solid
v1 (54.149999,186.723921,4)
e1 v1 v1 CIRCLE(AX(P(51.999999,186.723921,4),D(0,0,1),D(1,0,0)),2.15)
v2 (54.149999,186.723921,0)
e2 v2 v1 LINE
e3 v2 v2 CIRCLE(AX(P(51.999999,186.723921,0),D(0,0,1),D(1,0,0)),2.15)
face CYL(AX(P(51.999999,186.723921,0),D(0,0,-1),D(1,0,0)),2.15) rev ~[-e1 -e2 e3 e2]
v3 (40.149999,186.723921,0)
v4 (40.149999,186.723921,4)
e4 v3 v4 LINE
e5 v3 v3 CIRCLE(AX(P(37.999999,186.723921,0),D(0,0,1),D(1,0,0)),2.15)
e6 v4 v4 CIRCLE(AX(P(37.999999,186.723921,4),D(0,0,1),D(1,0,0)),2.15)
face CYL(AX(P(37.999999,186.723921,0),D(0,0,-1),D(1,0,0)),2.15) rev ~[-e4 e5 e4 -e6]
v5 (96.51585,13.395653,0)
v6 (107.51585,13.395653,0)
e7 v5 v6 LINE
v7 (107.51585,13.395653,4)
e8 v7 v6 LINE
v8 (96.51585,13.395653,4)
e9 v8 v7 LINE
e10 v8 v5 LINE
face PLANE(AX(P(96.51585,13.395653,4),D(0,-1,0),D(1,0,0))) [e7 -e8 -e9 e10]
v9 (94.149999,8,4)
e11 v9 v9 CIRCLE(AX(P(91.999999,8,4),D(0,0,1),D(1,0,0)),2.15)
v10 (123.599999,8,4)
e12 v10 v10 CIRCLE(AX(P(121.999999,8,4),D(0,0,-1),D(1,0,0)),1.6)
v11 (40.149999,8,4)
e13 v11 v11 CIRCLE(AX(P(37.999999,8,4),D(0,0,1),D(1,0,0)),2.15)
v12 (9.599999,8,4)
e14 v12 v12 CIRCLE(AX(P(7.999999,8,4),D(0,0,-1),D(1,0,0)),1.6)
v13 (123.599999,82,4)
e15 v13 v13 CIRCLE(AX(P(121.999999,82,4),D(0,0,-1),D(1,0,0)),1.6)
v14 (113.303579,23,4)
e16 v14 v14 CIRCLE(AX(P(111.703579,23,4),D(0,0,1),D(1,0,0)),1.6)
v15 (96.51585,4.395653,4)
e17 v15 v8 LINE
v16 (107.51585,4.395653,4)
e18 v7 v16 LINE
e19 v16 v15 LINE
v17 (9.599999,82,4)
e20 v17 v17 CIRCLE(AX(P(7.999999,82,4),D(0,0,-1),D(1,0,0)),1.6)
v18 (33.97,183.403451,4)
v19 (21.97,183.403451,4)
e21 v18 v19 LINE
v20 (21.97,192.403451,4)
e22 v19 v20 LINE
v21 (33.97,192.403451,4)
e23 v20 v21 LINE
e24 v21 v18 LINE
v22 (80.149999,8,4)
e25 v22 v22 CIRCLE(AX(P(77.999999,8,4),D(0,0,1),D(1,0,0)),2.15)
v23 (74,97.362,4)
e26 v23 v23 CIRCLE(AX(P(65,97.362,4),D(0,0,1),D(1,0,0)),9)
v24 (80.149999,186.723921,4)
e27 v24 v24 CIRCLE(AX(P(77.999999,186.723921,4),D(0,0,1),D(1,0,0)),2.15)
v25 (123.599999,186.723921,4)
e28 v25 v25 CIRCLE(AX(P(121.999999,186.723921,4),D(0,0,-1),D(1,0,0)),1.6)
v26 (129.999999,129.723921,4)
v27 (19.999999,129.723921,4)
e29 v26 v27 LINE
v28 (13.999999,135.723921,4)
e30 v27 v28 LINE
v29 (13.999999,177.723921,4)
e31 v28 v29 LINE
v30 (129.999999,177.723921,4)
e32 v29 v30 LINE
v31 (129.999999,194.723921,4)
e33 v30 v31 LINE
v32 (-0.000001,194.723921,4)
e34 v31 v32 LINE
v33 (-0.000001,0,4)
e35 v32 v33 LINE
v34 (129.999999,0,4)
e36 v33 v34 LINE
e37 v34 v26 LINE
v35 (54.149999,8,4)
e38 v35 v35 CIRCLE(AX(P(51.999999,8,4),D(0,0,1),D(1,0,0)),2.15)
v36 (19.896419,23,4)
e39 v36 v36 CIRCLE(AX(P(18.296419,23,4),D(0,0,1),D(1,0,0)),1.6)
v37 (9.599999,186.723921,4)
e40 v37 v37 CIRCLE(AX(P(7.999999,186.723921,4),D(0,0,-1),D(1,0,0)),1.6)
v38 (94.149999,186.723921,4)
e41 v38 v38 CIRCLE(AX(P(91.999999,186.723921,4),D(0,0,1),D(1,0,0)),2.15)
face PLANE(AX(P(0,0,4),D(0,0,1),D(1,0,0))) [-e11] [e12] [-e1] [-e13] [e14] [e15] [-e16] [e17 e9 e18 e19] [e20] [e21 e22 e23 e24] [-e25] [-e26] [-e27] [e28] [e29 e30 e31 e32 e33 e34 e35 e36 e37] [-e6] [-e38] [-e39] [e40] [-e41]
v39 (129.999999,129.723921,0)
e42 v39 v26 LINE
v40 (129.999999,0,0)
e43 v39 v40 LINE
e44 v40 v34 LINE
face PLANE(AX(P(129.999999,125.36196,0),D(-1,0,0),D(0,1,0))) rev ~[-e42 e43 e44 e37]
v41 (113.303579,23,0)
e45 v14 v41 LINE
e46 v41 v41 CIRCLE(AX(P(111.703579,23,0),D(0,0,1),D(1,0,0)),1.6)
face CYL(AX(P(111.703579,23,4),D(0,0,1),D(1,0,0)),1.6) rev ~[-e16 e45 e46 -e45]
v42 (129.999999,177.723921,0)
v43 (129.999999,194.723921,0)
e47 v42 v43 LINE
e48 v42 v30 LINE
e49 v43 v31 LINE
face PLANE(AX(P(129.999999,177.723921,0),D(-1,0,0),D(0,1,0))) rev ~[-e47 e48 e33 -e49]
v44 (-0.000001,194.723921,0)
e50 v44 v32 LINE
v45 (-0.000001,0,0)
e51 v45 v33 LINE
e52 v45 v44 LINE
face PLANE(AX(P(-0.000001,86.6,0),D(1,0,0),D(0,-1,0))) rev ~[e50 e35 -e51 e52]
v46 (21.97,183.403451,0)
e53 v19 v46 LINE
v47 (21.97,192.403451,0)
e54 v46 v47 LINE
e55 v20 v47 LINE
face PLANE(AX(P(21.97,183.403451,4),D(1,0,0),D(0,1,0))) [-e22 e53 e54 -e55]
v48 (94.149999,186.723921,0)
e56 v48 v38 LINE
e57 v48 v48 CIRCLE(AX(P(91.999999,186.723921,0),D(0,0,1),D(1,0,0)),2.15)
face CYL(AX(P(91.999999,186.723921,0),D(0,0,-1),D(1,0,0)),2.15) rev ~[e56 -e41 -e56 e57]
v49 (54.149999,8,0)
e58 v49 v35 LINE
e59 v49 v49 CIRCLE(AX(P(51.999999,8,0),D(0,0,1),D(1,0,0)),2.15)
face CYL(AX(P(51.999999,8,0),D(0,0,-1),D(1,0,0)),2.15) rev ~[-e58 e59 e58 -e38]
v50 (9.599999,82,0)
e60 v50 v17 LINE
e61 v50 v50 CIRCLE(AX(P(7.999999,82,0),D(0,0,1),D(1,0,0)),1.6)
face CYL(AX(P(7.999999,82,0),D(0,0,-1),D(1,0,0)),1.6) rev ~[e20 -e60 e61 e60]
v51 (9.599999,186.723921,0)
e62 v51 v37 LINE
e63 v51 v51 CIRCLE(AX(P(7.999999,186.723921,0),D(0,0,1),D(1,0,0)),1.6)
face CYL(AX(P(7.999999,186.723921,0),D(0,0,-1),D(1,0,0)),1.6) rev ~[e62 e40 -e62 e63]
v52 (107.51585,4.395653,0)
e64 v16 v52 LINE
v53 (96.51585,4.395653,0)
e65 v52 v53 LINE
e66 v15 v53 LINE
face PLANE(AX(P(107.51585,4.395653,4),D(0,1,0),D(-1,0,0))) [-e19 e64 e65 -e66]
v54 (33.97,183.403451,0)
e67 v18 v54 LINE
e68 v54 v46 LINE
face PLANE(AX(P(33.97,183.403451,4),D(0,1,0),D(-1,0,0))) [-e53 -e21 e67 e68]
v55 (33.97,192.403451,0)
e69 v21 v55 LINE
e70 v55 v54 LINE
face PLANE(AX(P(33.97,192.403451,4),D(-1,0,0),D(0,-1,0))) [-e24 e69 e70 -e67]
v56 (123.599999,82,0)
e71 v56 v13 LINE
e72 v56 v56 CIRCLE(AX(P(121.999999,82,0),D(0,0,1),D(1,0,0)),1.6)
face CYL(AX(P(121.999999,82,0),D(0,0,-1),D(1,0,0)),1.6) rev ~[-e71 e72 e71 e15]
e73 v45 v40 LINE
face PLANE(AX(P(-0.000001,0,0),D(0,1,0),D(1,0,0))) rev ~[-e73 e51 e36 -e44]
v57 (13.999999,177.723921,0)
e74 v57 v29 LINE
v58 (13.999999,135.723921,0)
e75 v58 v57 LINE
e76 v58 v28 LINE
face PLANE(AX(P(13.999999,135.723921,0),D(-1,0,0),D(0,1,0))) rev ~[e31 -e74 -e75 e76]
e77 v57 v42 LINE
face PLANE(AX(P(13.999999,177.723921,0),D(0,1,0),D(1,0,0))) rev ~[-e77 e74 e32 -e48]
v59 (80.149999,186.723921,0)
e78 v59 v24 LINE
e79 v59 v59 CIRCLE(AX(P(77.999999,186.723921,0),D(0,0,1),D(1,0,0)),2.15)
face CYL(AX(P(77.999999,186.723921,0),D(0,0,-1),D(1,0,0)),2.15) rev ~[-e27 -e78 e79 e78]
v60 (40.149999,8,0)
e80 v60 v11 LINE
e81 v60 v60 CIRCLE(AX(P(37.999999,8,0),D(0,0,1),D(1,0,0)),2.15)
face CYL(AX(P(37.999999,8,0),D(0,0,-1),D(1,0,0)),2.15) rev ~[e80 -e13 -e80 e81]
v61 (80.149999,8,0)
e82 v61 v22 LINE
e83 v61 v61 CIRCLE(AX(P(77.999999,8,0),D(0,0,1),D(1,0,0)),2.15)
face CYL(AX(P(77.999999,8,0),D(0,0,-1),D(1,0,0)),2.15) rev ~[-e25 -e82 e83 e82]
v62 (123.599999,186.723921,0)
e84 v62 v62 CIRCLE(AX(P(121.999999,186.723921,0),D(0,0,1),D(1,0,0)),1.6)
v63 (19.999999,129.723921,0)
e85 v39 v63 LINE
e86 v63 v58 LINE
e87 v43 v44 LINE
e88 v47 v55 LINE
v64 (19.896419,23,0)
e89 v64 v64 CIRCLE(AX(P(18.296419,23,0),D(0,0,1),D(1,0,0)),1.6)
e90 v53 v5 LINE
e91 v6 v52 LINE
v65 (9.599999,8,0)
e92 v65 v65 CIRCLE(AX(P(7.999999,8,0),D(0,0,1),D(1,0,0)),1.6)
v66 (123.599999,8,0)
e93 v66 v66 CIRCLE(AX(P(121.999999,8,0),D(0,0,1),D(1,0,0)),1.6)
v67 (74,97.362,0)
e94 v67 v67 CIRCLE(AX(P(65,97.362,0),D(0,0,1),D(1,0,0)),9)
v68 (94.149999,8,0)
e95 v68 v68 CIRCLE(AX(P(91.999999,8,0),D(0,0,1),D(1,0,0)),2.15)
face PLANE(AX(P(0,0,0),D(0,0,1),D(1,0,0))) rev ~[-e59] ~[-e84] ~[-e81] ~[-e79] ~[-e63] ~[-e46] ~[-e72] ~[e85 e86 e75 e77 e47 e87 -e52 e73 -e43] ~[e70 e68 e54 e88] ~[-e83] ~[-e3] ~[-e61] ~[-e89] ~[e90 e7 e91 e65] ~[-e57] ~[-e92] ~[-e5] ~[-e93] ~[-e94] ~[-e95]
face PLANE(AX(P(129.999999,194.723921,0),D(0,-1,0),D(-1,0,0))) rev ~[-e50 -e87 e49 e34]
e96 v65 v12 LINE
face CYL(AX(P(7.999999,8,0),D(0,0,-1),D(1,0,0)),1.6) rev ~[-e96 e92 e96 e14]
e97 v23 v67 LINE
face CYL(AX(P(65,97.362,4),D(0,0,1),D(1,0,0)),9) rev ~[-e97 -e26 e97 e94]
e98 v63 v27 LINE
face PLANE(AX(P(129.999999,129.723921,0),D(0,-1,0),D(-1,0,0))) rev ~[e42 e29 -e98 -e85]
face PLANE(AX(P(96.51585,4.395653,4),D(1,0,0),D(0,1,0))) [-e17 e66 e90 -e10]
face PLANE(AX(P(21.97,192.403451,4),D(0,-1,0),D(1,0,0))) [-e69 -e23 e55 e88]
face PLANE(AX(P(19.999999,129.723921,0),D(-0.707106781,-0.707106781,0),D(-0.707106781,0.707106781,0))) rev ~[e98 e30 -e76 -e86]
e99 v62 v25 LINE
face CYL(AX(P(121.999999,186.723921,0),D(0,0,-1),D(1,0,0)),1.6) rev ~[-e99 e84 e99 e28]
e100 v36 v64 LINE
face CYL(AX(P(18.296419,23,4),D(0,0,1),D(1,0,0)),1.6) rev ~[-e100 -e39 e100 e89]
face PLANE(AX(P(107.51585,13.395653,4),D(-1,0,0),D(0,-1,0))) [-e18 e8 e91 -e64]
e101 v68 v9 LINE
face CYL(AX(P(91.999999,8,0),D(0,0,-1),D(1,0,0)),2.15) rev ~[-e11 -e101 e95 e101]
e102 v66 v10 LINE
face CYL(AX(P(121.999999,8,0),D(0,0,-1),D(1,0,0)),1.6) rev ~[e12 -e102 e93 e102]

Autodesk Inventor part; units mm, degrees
ref_plane "YZ Plane" through (0, 0, 0) normal (1, 0, 0) x (0, 1, 0)
ref_plane "XZ Plane" through (0, 0, 0) normal (0, 1, 0) x (-1, 0, 0)
ref_plane "XY Plane" through (0, 0, 0) normal (0, 0, 1) x (1, 0, 0)
sketch "スケッチ3" plane through (0, 0, 0) normal (0, 0, 1) x (1, 0, 0)
  line L0 (129.999999, 177.723921) -> (129.999999, 194.723921)
  line L1 (129.999999, 194.723921) -> (-0.000001, 194.723921)
  line L2 (-0.000001, 0) -> (129.999999, 0)
  circle A0 centre (77.999999, 186.723921) radius 2.15
  circle A1 centre (91.999999, 186.723921) radius 2.15
  circle A2 centre (51.999999, 186.723921) radius 2.15
  circle A3 centre (37.999999, 186.723921) radius 2.15
  circle A4 centre (77.999999, 8) radius 2.15
  circle A5 centre (91.999999, 8) radius 2.15
  circle A6 centre (51.999999, 8) radius 2.15
  circle A7 centre (37.999999, 8) radius 2.15
  line L3 (129.999999, 129.723921) -> (19.999999, 129.723921)
  line L4 (13.999999, 135.723921) -> (13.999999, 177.723921)
  line L5 (13.999999, 177.723921) -> (129.999999, 177.723921)
  line L6 (19.999999, 129.723921) -> (13.999999, 135.723921)
  circle A8 centre (64.999999, 97.36196) radius 8
  circle A9 centre (7.999999, 186.723921) radius 1.6
  circle A10 centre (121.999999, 186.723921) radius 1.6
  circle A11 centre (121.999999, 8) radius 1.6
  circle A12 centre (7.999999, 8) radius 1.6
  circle A13 centre (7.999999, 82) radius 1.6
  circle A14 centre (121.999999, 82) radius 1.6
  line L7 (64.999999, 88.36196) -> (64.999999, 42.36196)
  line L8 (3.399999, 186.723921) -> (12.599999, 186.723921)
  line L9 (7.999999, 182.123921) -> (7.999999, 191.323921)
  line L10 (117.399999, 186.723921) -> (126.599999, 186.723921)
  line L11 (121.999999, 182.123921) -> (121.999999, 191.323921)
  line L12 (117.399999, 8) -> (126.599999, 8)
  line L13 (121.999999, 3.4) -> (121.999999, 12.6)
  line L14 (3.399999, 8) -> (12.599999, 8)
  line L15 (7.999999, 3.4) -> (7.999999, 12.6)
  line L16 (3.399999, 82) -> (12.599999, 82)
  line L17 (7.999999, 77.4) -> (7.999999, 86.6)
  line L18 (126.599999, 82) -> (117.399999, 82)
  line L19 (121.999999, 77.4) -> (121.999999, 86.6)
  circle A15 centre (91.999999, 186.723921) radius 2.15
  circle A16 centre (77.999999, 186.723921) radius 2.15
  circle A17 centre (51.999999, 186.723921) radius 2.15
  circle A18 centre (37.999999, 186.723921) radius 2.15
  circle A19 centre (64.999999, 97.36196) radius 8
  circle A20 centre (91.999999, 8) radius 2.15
  circle A21 centre (77.999999, 8) radius 2.15
  circle A22 centre (51.999999, 8) radius 2.15
  circle A23 centre (37.999999, 8) radius 2.15
  circle A24 centre (7.999999, 8) radius 1.6
  circle A25 centre (121.999999, 8) radius 1.6
  circle A26 centre (121.999999, 82) radius 1.6
  circle A27 centre (121.999999, 186.723921) radius 1.6
  circle A28 centre (7.999999, 186.723921) radius 1.6
  circle A29 centre (7.999999, 82) radius 1.6
  line L20 (-0.000001, 0) -> (129.999999, 0)
  line L21 (129.999999, 177.723921) -> (129.999999, 194.723921)
  line L22 (129.999999, 194.723921) -> (-0.000001, 194.723921)
  line L23 (129.999999, 177.723921) -> (13.999999, 177.723921)
  line L24 (13.999999, 177.723921) -> (13.999999, 135.723921)
  line L25 (13.999999, 135.723921) -> (19.999999, 129.723921)
  line L26 (-0.000001, 194.723921) -> (-0.000001, 119.36196)
  line L27 (-0.000001, 86.6) -> (-0.000001, 0)
  line L28 (-0.000001, 194.723921) -> (-0.000001, 119.36196)
  line L29 (-0.000001, 86.6) -> (-0.000001, 0)
  line L30 (129.999999, 0) -> (129.999999, 86.6)
  line L31 (129.999999, 125.36196) -> (129.999999, 129.723921)
  line L32 (129.999999, 0) -> (129.999999, 86.6)
  line L33 (129.999999, 125.36196) -> (129.999999, 129.723921)
  circle A30 centre (18.296419, 23) radius 1.6
  circle A31 centre (111.703579, 23) radius 1.6
  line L34 (-0.000001, 119.36196) -> (-0.000001, 86.6)
  line L35 (129.999999, 86.6) -> (129.999999, 125.36196)
  point P0 (0, 0)
  point P1 (0, 0)
sketch "スケッチ4" plane through (0, 0, 0) normal (0, 0, 1) x (1, 0, 0)
  point P0 (0, 0)
extrude "押し出し1" add sketch "スケッチ3" along normal blind 4 contours L5 L4 L6 L3 L31 L35 L30 L2 L27 L34 L26 L1 L0 | A30 | A31
sketch "スケッチ5" plane through (0, 0, 4) normal (0, 0, 1) x (1, 0, 0)
  line L0 (-10, 0) -> (140, 0)
  arc A0 (140, -0.0003) -> (140, 0.0003) centre (140, 0) ccw
  arc A1 (-10, 0.0003) -> (-10, -0.0003) centre (-10, 0) ccw
  line L1 (140, 0) -> (140, 194.7239)
  arc A2 (140.0002, 194.7239) -> (139.9998, 194.7239) centre (140, 194.7239) ccw
  arc A3 (139.9998, 0) -> (140.0002, 0) centre (140, 0) ccw
  line L2 (140, 194.7239) -> (-10, 194.7239)
  arc A4 (-10, 194.7242) -> (-10, 194.7237) centre (-10, 194.72395) ccw
  arc A5 (140, 194.7237) -> (140, 194.7242) centre (140, 194.72395) ccw
  arc A6 (-10.0004, 0) -> (-10, 0) centre (-10.0002, 0) ccw
  arc A7 (-9.9996, 194.7239) -> (-10, 194.7239) centre (-9.9998, 194.7239) ccw
  arc A8 (65, 88.362) -> (65, 106.362) centre (65, 97.362) ccw
  arc A9 (65, 106.362) -> (65, 88.362) centre (65, 97.362) ccw
  arc A10 (65, 158.7239) -> (65, 176.7239) centre (65, 167.7239) ccw
  arc A11 (65, 176.7239) -> (65, 158.7239) centre (65, 167.7239) ccw
  line L3 (125.6971, 165.1236) -> (118.0771, 165.1236)
  line L4 (115.5371, 165.1236) -> (115.5371, 160.0436)
  line L5 (121.66, 165.205) -> (120.39, 165.205)
  arc A12 (121.66, 165.1669) -> (121.66, 165.2431) centre (121.66, 165.205) ccw
  line L6 (81.02, 174.095) -> (85.719, 174.095)
  arc A13 (81.02, 174.1331) -> (81.02, 174.0569) centre (81.02, 174.095) ccw
  line L7 (81.02, 174.095) -> (81.02, 165.205)
  arc A14 (80.9819, 165.205) -> (81.0581, 165.205) centre (81.02, 165.205) ccw
  arc A15 (81.0581, 174.095) -> (80.9819, 174.095) centre (81.02, 174.095) ccw
  line L8 (121.66, 165.205) -> (121.66, 174.095)
  arc A16 (121.6981, 174.095) -> (121.6219, 174.095) centre (121.66, 174.095) ccw
  arc A17 (121.6219, 165.205) -> (121.6981, 165.205) centre (121.66, 165.205) ccw
  line L9 (82.29, 165.205) -> (81.02, 165.205)
  arc A18 (81.02, 165.2431) -> (81.02, 165.1669) centre (81.02, 165.205) ccw
  line L10 (121.66, 174.095) -> (117.342, 174.095)
  arc A19 (121.66, 174.0569) -> (121.66, 174.1331) centre (121.66, 174.095) ccw
  line L11 (52.85, 166.325) -> (48.151, 166.325)
  arc A20 (52.85, 166.2869) -> (52.85, 166.3631) centre (52.85, 166.325) ccw
  line L12 (52.85, 166.325) -> (52.85, 175.215)
  arc A21 (52.8881, 175.215) -> (52.8119, 175.215) centre (52.85, 175.215) ccw
  arc A22 (52.8119, 166.325) -> (52.8881, 166.325) centre (52.85, 166.325) ccw
  line L13 (51.58, 175.215) -> (52.85, 175.215)
  arc A23 (52.85, 175.1769) -> (52.85, 175.2531) centre (52.85, 175.215) ccw
  arc A24 (72.9742, 175.4632) -> (72.9742, 175.768) centre (72.9742, 175.6156) ccw
  arc A25 (72.9742, 175.768) -> (72.9742, 175.4632) centre (72.9742, 175.6156) ccw
  arc A26 (72.9742, 175.4632) -> (72.9742, 175.768) centre (72.9742, 175.6156) ccw
  arc A27 (72.9742, 175.768) -> (72.9742, 175.4632) centre (72.9742, 175.6156) ccw
  arc A28 (86.106, 110.5662) -> (86.106, 110.871) centre (86.106, 110.7186) ccw
  arc A29 (86.106, 110.871) -> (86.106, 110.5662) centre (86.106, 110.7186) ccw
  arc A30 (86.106, 110.5662) -> (86.106, 110.871) centre (86.106, 110.7186) ccw
  arc A31 (86.106, 110.871) -> (86.106, 110.5662) centre (86.106, 110.7186) ccw
  line L14 (80.9819, 174.095) -> (121.6981, 174.095)
  line L15 (121.6981, 174.095) -> (121.6981, 165.205)
  line L16 (121.6981, 165.205) -> (80.9819, 165.205)
  line L17 (80.9819, 165.205) -> (80.9819, 174.095)
  line L18 (52.8, 176.585002) -> (11.364013, 176.585002)
  line L19 (11.364013, 176.585002) -> (11.364013, 165.1236)
  line L20 (11.364013, 165.1236) -> (52.8, 165.1236)
  line L21 (52.8, 165.1236) -> (52.8, 176.585002)
  line L22 (-10, 194.7239) -> (-10, 0)
  line L23 (21.97, 192.403451) -> (33.97, 192.403451)
  line L24 (33.97, 192.403451) -> (33.97, 183.403451)
  line L25 (33.97, 183.403451) -> (21.97, 183.403451)
  line L26 (21.97, 183.403451) -> (21.97, 192.403451)
  line L27 (0, 0) -> (129.999999, 0)
  line L28 (96.51585, 13.395653) -> (107.51585, 13.395653)
  line L29 (107.51585, 13.395653) -> (107.51585, 4.395653)
  line L30 (107.51585, 4.395653) -> (96.51585, 4.395653)
  line L31 (96.51585, 4.395653) -> (96.51585, 13.395653)
  circle A32 centre (65, 97.362) radius 9
  point P0 (71.80055, 0)
sketch "スケッチ5 outline for 押し出し2" plane through (0, 0, 4) normal (0, 0, 1) x (1, 0, 0)
  line L0 (96.51585, 13.395653) -> (107.51585, 13.395653)
  line L1 (107.51585, 13.395653) -> (107.51585, 4.395653)
  line L2 (107.51585, 4.395653) -> (96.51585, 4.395653)
  line L3 (96.51585, 4.395653) -> (96.51585, 13.395653)
  line L4 (21.97, 192.403451) -> (33.97, 192.403451)
  line L5 (33.97, 192.403451) -> (33.97, 183.403451)
  line L6 (33.97, 183.403451) -> (21.97, 183.403451)
  line L7 (21.97, 183.403451) -> (21.97, 192.403451)
  circle A0 centre (65, 97.362) radius 9
  line L8 (121.6981, 165.205) -> (121.6981, 174.095)
  line L9 (80.9819, 165.205) -> (121.6981, 165.205)
  line L10 (80.9819, 174.095) -> (80.9819, 165.205)
  line L11 (121.6981, 174.095) -> (80.9819, 174.095)
extrude "押し出し2" cut sketch "スケッチ5 outline for 押し出し2" against normal blind 10
sketch "スケッチ7" plane through (0, 0, 4) normal (0, 0, 1) x (1, 0, 0)
  point P0 (0, 0)
sketch "スケッチ8" plane through (0, 0, 4) normal (0, 0, 1) x (1, 0, 0)
  circle A0 centre (18.296419, 23) radius 1.6
  circle A1 centre (111.703579, 23) radius 1.6
  point P0 (0, 0)
extrude "押し出し5" cut sketch "スケッチ8" against normal blind 4
properties part number "2枚目kai" material "MDF 中密度繊維ボード"
